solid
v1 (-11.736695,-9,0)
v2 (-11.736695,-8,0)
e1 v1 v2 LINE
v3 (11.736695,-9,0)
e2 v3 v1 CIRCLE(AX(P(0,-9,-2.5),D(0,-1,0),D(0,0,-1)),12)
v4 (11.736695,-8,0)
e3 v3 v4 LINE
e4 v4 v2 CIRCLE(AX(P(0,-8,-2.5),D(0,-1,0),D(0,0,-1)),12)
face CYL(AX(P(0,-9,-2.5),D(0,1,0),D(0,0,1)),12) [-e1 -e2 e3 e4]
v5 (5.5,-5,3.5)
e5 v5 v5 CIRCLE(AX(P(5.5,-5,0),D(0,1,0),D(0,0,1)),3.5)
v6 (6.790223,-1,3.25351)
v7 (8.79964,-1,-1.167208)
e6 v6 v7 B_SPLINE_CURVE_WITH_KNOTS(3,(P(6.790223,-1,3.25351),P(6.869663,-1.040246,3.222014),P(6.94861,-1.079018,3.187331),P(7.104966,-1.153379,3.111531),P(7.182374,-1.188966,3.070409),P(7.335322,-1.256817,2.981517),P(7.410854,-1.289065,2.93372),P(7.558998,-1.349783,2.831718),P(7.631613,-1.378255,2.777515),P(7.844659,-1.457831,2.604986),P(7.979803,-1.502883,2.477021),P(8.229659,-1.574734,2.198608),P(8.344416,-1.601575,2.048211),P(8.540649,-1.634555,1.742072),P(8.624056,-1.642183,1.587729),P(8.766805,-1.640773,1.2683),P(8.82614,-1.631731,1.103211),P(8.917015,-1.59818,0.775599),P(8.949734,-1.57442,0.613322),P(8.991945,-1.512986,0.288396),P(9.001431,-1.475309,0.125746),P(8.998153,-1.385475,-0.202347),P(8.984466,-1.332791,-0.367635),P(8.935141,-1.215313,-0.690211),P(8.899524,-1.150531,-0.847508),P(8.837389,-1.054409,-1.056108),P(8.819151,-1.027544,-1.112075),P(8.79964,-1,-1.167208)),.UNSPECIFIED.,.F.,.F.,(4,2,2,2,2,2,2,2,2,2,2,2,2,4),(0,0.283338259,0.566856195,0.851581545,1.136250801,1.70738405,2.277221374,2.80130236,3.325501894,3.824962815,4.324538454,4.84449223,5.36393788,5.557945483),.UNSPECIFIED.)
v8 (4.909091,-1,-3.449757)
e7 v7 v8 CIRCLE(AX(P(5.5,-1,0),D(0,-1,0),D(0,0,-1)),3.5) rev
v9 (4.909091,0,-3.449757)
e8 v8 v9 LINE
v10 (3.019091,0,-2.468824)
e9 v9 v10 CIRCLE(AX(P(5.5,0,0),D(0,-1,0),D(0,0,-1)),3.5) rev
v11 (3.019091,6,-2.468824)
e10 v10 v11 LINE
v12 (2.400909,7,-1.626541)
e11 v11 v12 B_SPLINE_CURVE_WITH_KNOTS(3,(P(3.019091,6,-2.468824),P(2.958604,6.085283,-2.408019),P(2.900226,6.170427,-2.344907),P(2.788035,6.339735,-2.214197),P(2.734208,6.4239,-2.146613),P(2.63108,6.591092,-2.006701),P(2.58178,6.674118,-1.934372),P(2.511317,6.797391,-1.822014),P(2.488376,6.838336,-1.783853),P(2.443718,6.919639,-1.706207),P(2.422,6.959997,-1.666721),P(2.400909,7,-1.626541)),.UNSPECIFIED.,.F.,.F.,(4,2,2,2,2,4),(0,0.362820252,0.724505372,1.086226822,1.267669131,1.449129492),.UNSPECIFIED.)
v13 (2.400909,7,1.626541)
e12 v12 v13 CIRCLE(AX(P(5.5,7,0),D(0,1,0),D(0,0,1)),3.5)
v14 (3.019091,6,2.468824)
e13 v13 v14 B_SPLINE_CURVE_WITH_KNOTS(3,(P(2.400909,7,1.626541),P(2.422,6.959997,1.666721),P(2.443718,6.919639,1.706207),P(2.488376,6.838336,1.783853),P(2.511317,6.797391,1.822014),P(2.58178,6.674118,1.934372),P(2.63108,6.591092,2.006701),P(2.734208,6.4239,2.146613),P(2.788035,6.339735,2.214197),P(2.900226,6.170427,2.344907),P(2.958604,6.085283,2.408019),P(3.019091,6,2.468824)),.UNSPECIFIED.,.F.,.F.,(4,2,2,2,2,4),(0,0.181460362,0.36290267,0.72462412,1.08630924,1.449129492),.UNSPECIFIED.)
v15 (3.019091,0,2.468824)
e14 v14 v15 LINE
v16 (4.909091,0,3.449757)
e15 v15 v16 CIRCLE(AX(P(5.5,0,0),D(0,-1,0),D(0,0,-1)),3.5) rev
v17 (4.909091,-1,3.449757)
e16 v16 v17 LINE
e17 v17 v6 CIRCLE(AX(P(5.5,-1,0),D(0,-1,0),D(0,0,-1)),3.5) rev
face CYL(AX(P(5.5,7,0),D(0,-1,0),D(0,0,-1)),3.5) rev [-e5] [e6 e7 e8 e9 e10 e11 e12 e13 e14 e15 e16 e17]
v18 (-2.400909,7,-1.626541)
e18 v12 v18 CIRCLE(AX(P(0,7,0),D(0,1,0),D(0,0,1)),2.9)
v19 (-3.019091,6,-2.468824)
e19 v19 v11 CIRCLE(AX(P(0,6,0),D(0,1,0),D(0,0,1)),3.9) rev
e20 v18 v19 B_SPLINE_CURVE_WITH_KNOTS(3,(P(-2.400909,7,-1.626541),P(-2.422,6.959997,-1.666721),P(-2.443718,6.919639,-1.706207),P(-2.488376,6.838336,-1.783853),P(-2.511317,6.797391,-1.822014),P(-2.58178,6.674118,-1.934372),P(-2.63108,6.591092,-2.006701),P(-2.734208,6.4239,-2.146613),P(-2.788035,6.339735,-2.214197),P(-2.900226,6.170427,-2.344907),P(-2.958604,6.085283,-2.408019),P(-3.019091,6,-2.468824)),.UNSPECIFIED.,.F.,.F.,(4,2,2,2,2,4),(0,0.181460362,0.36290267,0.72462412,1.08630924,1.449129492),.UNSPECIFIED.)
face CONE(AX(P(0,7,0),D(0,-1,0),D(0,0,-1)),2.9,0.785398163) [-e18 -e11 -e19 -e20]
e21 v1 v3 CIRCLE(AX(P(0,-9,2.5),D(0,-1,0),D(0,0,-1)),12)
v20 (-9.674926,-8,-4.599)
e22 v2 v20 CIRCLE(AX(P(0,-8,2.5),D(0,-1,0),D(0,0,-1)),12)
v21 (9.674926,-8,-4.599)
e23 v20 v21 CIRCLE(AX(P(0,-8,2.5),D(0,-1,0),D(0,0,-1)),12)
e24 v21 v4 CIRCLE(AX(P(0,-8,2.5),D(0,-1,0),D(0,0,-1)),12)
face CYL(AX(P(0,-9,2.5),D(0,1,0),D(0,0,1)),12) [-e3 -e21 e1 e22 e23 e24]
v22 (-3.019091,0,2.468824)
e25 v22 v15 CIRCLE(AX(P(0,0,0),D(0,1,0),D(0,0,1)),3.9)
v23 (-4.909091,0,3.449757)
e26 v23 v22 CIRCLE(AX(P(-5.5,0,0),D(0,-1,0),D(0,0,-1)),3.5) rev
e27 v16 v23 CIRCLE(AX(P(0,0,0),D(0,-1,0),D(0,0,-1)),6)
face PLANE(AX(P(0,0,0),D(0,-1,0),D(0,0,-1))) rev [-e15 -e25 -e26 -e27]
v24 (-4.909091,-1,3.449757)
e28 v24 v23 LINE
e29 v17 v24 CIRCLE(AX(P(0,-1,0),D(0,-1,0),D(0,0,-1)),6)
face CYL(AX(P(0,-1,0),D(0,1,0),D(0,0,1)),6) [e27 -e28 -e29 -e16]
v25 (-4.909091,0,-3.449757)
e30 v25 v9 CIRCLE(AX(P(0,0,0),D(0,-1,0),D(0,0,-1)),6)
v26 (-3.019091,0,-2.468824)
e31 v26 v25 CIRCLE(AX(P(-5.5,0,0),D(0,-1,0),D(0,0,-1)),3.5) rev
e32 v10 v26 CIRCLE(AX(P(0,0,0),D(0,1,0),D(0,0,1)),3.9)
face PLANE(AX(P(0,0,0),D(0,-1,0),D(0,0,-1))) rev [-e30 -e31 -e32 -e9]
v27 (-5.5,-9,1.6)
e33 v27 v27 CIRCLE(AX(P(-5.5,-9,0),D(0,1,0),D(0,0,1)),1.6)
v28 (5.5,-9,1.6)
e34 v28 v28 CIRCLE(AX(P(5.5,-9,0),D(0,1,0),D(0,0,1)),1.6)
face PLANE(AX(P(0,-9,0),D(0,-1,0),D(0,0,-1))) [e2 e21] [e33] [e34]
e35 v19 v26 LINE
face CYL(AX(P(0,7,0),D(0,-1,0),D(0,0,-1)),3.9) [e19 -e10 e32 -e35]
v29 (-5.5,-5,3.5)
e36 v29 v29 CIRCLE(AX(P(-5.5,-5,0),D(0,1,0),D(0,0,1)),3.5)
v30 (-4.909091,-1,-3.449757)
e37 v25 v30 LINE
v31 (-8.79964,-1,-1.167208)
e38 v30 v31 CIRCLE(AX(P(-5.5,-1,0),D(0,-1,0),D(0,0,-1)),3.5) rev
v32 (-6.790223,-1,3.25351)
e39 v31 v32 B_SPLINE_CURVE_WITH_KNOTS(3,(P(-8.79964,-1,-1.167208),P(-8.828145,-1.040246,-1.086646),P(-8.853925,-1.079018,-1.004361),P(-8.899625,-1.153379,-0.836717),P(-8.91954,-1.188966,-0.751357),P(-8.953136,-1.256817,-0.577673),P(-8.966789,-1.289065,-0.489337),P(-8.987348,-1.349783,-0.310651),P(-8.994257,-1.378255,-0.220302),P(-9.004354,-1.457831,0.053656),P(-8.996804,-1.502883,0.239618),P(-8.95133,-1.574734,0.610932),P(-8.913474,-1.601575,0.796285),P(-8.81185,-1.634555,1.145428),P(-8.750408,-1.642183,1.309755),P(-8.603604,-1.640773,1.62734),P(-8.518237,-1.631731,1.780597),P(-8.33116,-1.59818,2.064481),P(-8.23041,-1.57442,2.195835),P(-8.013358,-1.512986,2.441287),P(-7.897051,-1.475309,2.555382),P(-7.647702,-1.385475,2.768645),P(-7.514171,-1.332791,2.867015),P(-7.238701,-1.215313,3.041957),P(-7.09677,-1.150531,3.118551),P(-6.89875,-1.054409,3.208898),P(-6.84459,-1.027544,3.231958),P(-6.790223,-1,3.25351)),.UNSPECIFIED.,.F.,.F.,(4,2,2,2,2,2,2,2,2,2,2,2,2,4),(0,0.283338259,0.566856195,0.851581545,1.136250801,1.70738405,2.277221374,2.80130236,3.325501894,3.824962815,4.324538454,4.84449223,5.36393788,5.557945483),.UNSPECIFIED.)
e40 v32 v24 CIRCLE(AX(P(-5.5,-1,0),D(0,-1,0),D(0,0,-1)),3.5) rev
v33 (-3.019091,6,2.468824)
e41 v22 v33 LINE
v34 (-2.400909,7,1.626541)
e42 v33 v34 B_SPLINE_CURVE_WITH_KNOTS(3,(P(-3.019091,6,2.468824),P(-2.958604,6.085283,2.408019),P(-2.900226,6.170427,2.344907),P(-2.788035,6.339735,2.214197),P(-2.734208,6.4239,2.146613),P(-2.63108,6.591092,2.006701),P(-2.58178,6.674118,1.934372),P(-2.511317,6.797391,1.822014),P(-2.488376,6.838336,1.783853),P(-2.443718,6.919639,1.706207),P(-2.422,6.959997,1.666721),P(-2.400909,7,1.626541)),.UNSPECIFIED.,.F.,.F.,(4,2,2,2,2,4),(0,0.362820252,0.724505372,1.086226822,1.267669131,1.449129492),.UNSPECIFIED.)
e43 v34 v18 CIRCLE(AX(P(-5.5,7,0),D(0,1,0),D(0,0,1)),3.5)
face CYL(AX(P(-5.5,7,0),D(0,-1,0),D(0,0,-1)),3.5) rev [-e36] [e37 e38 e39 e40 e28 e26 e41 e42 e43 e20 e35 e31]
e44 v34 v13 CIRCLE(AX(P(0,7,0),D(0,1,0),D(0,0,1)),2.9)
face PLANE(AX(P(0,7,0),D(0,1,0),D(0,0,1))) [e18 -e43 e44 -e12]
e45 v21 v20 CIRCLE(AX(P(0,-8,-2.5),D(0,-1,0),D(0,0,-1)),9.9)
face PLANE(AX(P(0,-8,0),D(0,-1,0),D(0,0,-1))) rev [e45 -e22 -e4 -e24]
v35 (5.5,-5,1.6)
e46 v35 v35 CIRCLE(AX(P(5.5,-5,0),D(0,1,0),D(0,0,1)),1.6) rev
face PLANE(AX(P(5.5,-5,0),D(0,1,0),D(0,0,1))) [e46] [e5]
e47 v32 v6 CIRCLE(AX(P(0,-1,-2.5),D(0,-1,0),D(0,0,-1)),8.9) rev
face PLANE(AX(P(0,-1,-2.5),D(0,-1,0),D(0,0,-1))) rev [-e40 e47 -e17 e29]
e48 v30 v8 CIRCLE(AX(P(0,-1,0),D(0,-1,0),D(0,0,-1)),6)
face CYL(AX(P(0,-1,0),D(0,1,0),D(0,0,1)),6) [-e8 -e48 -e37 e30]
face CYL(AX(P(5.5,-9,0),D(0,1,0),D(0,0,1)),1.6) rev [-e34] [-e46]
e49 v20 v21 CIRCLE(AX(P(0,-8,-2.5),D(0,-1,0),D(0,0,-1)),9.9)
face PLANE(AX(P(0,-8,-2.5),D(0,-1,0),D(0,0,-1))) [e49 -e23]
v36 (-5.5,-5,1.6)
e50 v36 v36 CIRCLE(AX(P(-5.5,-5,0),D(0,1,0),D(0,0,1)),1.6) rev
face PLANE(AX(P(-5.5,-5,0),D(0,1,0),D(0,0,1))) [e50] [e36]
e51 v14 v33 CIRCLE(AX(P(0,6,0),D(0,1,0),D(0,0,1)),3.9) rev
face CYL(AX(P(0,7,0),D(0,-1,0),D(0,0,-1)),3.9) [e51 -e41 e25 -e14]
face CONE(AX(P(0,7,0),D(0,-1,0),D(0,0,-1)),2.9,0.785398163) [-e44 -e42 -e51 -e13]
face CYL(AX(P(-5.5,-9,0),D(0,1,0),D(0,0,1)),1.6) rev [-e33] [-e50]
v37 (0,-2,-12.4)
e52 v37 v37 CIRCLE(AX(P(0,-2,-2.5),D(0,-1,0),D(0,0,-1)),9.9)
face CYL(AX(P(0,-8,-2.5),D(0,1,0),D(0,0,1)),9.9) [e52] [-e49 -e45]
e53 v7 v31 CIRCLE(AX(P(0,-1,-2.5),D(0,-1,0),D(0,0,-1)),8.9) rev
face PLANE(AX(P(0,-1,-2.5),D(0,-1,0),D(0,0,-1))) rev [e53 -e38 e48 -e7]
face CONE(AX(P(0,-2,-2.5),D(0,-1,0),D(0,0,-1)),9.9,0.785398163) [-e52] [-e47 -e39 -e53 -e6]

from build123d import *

# Parameters (mm, degrees)
SKETCH1_R               = 3.9
BOSS_EXTRUDE1_DEPTH     = 7
SKETCH2_R               = 6
BOSS_EXTRUDE2_DEPTH     = 1
SKETCH3_R               = 9.9
BOSS_EXTRUDE3_DEPTH     = 7
BOSS_EXTRUDE4_DEPTH     = 1
SKETCH5_R               = 1.6
CUT_EXTRUDE1_DEPTH      = 20.300518128
CUT_EXTRUDE2_DEPTH      = 20.300518128
CUT_EXTRUDE2_DEPTH_BACK = 5
SKETCH7_R               = 3.5
CHAMFER1_SIZE           = 1


with BuildPart() as part:
    # Sketch1 → Boss-Extrude1 (new body)
    with BuildSketch(Plane(origin=(0, 0, 0), x_dir=(1, 0, 0), z_dir=(0, 1, 0))):
        with Locations(Location((0, 0, 0), (0, 0, 270))):
            Circle(SKETCH1_R)
    extrude(amount=BOSS_EXTRUDE1_DEPTH)

    # Sketch2 → Boss-Extrude2 (add)
    with BuildSketch(Plane(origin=(0, 0, 0), x_dir=(-1, 0, 0), z_dir=(0, -1, 0))):
        with Locations(Location((0, 0, 0), (0, 0, 90))):
            Circle(SKETCH2_R)
    extrude(amount=BOSS_EXTRUDE2_DEPTH)

    # Sketch3 → Boss-Extrude3 (add)
    with BuildSketch(Plane(origin=(0, -1, 0), x_dir=(-1, 0, 0), z_dir=(0, -1, 0))):
        with Locations(Location((0, 2.5, 0), (0, 0, 90))):
            Circle(SKETCH3_R)
    extrude(amount=BOSS_EXTRUDE3_DEPTH)

    # Sketch4 → Boss-Extrude4 (add)
    with BuildSketch(Plane(origin=(0, -8, 0), x_dir=(-1, 0, 0), z_dir=(0, -1, 0))):
        with BuildLine():
            ThreePointArc((-11.736694594, 0), (0, -9.5), (11.736694594, 0))
            ThreePointArc((11.736694594, 0), (0, 9.5), (-11.736694594, 0))
        make_face()
    extrude(amount=BOSS_EXTRUDE4_DEPTH)

    # Sketch5 → Cut-Extrude1 (cut, through all)
    with BuildSketch(Plane(origin=(0, 0, 0), x_dir=(1, 0, 0), z_dir=(0, 1, 0))):
        with Locations(Location((5.5, 0, 0), (0, 0, 270))):
            Circle(SKETCH5_R)
        with Locations(Location((-5.5, 0, 0), (0, 0, 270))):
            Circle(SKETCH5_R)
    extrude(amount=-CUT_EXTRUDE1_DEPTH, mode=Mode.SUBTRACT)

    # Sketch7 → Cut-Extrude2 (cut, two sides: drawn at the far end of the back side and taken through both)
    with BuildSketch(Plane(origin=(0, 0, 0), x_dir=(1, 0, 0), z_dir=(0, 1, 0)).offset(-CUT_EXTRUDE2_DEPTH_BACK)):
        with Locations(Location((-5.5, 0, 0), (0, 0, 80.280132298))):
            Circle(SKETCH7_R)
        with Locations(Location((5.5, 0, 0), (0, 0, 99.719867702))):
            Circle(SKETCH7_R)
    extrude(amount=CUT_EXTRUDE2_DEPTH + CUT_EXTRUDE2_DEPTH_BACK, mode=Mode.SUBTRACT)

    # Chamfer1
    # the kernel refuses this chamfer: 1 mm, written as the material it takes off along each edge
    with BuildSketch(Plane(origin=(0, -1, -2.5), x_dir=(0, 0, -1), z_dir=(-1, 0, 0))) as chamfer1_piece_1:
        Polygon((9.9, CHAMFER1_SIZE), (9.9 - CHAMFER1_SIZE, 0), (9.9, 0), align=None)
    revolve(axis=Axis((0, -1, -2.5), (0, -1, 0)), mode=Mode.SUBTRACT)
    with BuildSketch(Plane(origin=(0, 7, 0), x_dir=(0.9996692397523004, 0, -0.025717913855091756), z_dir=(0.025717913855091756, 0, 0.9996692397523004))) as chamfer1_piece_2:
        Polygon((3.9 - CHAMFER1_SIZE, 0), (3.9, -CHAMFER1_SIZE), (3.9, 0), align=None)
    revolve(axis=Axis((0, 7, 0), (0, 1, 0)), revolution_arc=177.05261919, mode=Mode.SUBTRACT)
    with BuildSketch(Plane(origin=(0, 7, 0), x_dir=(0.9996692397523004, 0, 0.02571791385509249), z_dir=(0.02571791385509249, 0, -0.9996692397523004))) as chamfer1_piece_3:
        Polygon((3.9, CHAMFER1_SIZE), (3.9 - CHAMFER1_SIZE, 0), (3.9, 0), align=None)
    revolve(axis=Axis((0, 7, 0), (0, -1, 0)), revolution_arc=177.05261919, mode=Mode.SUBTRACT)


solid = part.part
